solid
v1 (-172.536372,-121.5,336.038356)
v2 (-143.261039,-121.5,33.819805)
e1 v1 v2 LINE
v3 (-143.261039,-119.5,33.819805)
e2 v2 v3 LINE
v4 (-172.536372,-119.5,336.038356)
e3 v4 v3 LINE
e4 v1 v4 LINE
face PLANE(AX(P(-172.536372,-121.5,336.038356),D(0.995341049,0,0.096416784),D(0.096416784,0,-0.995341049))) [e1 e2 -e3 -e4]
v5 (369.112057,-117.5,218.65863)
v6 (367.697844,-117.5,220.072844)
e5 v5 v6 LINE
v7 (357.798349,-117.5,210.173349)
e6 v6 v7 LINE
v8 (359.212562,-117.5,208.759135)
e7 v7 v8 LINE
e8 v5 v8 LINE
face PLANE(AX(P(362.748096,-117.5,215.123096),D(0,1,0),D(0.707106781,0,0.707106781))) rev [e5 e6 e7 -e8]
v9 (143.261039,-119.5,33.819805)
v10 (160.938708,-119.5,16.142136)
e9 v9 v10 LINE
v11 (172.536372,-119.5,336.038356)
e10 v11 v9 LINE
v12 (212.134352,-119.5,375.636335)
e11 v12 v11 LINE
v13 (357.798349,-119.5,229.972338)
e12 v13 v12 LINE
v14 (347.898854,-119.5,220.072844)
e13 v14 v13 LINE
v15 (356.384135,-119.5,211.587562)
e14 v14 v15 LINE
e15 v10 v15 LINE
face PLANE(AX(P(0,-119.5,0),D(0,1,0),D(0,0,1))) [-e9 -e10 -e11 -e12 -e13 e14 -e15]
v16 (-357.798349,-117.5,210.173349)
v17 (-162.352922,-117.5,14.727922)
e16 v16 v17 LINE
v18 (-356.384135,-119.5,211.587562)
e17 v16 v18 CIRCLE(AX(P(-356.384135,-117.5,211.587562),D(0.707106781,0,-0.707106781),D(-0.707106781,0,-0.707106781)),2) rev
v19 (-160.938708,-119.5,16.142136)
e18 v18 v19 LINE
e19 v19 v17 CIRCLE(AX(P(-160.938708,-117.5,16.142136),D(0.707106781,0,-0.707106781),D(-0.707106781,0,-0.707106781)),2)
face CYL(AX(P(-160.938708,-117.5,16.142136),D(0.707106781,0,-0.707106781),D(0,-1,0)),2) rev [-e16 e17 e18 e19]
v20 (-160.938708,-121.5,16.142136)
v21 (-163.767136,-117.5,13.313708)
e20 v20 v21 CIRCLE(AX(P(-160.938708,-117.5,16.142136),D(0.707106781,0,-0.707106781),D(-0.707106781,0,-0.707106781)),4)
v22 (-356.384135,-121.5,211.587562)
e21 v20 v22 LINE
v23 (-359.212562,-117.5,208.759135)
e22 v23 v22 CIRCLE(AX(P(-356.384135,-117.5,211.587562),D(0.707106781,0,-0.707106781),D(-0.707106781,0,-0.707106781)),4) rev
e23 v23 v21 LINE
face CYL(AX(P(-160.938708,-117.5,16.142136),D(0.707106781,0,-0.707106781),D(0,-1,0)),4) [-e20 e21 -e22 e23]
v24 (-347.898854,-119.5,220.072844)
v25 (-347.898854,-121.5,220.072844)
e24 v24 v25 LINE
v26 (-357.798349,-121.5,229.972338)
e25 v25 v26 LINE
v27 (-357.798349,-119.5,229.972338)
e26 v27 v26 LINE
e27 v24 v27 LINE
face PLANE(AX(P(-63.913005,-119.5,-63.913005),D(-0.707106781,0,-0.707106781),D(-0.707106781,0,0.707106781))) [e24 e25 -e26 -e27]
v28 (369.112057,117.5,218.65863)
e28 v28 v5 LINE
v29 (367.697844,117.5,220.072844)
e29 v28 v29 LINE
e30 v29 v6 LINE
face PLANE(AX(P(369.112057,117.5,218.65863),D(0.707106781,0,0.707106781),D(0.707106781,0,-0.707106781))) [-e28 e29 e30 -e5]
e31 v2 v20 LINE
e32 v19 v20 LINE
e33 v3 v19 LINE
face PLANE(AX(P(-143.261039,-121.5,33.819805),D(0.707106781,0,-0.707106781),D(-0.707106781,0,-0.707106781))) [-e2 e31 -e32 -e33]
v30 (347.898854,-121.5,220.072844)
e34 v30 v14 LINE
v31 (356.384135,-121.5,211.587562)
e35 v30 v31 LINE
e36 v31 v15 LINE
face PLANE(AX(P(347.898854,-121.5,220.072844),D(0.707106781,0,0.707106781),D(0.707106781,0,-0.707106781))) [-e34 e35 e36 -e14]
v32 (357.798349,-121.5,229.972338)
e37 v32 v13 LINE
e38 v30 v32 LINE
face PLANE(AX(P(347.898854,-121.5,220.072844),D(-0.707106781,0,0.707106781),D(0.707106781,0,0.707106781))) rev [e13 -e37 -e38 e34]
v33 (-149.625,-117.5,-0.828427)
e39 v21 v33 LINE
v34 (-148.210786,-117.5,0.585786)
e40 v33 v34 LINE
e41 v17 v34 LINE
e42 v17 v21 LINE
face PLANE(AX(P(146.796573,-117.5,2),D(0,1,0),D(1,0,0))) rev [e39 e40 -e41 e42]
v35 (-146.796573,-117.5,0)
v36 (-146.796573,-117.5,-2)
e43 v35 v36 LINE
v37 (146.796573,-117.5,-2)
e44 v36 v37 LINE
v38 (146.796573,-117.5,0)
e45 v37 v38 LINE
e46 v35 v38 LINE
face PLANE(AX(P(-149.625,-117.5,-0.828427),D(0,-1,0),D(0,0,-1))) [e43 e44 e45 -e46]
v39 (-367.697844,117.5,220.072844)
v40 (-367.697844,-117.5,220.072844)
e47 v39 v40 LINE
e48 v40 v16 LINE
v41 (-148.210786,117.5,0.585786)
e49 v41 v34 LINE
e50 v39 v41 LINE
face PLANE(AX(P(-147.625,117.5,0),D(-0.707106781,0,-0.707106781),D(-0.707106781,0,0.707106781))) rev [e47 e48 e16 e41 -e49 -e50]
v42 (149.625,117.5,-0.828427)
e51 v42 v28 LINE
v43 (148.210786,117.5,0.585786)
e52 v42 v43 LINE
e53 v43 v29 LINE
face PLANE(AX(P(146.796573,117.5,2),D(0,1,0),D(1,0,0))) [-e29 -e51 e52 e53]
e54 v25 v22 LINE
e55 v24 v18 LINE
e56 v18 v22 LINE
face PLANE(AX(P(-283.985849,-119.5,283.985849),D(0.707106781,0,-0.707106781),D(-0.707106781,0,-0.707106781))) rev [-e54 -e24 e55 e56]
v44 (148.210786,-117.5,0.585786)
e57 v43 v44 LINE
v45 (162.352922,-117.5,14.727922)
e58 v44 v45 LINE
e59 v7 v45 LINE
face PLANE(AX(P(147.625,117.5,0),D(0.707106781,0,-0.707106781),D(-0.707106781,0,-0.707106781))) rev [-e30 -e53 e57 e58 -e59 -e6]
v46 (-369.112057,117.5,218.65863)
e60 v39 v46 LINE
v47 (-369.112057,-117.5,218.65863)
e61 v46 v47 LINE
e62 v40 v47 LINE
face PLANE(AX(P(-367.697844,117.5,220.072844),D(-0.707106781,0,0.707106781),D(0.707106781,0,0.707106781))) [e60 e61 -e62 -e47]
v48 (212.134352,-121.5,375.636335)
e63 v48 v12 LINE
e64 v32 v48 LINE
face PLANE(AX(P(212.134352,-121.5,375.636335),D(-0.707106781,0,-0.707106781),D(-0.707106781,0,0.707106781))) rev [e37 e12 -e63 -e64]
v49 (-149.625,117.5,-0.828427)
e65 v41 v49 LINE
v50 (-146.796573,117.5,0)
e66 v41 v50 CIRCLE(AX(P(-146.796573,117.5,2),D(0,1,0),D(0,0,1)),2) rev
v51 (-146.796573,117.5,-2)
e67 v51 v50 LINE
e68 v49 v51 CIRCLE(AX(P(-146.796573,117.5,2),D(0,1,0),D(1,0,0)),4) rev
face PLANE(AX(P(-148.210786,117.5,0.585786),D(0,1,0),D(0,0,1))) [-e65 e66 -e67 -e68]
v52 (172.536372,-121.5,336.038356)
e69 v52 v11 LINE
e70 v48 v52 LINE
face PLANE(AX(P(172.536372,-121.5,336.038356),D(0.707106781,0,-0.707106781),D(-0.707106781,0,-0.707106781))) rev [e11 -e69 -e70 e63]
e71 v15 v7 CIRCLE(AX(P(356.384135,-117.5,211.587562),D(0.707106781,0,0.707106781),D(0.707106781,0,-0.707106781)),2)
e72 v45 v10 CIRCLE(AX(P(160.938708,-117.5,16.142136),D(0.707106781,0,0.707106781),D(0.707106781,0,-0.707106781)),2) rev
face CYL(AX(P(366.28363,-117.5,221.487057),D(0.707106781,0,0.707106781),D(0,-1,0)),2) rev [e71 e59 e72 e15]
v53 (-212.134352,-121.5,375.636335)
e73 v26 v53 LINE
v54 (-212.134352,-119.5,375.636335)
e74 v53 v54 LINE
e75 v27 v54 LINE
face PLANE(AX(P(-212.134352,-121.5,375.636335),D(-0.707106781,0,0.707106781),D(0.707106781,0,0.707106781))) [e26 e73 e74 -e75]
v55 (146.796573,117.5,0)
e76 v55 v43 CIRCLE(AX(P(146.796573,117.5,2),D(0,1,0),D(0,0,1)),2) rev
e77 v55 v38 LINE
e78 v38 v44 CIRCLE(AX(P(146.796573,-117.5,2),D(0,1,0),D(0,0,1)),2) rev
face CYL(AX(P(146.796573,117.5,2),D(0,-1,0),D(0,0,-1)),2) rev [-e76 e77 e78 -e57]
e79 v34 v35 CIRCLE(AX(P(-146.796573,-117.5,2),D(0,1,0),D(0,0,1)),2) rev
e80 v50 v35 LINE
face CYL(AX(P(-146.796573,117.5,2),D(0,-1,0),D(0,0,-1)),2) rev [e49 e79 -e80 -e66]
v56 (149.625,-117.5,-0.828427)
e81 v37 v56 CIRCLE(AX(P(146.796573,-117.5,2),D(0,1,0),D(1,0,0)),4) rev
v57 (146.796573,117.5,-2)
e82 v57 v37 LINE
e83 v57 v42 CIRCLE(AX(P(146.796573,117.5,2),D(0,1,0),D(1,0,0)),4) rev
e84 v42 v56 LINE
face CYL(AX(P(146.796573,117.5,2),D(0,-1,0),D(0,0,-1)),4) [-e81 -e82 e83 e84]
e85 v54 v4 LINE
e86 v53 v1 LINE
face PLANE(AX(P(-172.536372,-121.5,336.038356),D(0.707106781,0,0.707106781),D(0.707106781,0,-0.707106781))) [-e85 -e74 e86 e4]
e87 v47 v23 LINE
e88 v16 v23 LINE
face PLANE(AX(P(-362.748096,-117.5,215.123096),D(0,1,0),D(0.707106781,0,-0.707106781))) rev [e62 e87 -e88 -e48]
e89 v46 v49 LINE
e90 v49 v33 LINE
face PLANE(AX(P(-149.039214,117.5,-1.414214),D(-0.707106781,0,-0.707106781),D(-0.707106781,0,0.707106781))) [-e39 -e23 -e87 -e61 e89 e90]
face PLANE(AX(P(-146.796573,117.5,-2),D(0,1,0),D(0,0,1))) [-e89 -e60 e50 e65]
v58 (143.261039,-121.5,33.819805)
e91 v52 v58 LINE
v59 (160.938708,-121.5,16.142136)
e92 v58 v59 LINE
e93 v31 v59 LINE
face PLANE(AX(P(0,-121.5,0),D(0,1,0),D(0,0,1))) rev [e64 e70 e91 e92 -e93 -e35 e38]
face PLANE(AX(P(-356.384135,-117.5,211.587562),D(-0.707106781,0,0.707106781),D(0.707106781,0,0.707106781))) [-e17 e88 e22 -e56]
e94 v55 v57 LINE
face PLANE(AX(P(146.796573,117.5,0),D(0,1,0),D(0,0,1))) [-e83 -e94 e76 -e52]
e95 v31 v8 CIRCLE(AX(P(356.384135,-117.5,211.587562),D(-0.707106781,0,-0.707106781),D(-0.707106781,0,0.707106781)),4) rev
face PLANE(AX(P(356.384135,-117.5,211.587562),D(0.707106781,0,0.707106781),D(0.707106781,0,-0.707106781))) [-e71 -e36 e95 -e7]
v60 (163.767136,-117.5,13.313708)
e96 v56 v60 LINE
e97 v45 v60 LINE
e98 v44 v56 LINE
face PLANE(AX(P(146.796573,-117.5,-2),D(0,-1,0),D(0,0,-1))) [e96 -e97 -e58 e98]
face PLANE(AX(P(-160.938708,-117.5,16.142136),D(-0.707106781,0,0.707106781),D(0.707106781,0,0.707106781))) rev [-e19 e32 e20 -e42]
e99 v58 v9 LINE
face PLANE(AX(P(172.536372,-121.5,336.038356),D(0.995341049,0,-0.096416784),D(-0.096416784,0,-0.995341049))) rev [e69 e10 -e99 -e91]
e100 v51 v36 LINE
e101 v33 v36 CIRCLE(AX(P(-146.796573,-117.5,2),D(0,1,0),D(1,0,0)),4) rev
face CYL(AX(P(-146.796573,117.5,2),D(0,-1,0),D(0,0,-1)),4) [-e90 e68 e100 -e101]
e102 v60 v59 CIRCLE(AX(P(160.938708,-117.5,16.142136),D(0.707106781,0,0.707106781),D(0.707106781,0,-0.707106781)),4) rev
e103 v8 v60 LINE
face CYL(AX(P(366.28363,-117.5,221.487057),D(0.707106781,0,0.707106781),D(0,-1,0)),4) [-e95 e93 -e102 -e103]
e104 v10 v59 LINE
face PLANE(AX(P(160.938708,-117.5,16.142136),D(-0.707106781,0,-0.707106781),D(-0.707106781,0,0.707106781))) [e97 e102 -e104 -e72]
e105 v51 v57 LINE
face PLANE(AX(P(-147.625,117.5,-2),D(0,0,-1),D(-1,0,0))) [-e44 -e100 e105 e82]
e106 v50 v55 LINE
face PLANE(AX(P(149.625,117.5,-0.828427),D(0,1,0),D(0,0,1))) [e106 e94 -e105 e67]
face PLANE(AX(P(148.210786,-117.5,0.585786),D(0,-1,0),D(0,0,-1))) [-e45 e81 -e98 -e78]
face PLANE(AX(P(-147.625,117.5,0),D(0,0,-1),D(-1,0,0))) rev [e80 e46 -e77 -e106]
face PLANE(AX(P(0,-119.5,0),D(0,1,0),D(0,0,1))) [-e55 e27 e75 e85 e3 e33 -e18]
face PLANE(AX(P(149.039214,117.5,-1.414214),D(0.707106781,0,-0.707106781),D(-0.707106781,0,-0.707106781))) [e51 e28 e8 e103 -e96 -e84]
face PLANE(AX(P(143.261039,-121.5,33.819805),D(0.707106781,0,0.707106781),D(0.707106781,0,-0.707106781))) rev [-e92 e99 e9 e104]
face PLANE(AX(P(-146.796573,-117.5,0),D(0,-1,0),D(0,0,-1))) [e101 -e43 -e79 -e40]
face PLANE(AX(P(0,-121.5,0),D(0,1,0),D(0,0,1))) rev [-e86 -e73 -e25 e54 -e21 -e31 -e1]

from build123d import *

# Parameters (mm, degrees)
SM_BASE_FLANGE_1_DEPTH      = 117.5
SM_EDGE_FLANGE_1_DEPTH      = 290.401572875
SM_START                    = 2
SM_EDGE_FLANGE_1_FLAT_DEPTH = 2
CUT_EXTRUDE_START           = -14
CUT_EXTRUDE_2_DEPTH         = 14


# Read off the part's stored shape, not the designer's step: 切除-拉伸2
# Sheet-metal steps are written as plain solids
with BuildPart() as part:
    # Sketch 1 → 基体-法兰1 (new, symmetric)
    with BuildSketch(Plane(origin=(0, 0, 0), x_dir=(1, 0, 0), z_dir=(0, 1, 0))):
        with BuildLine():
            Line((-367.697843509, -220.072843509), (-148.210786438, -0.585786438))
            ThreePointArc((-148.210786438, -0.585786438), (-147.56193974, -0.152240935), (-146.796572875, 0))
            Line((-146.796572875, 0), (146.796572875, 0))
            ThreePointArc((146.796572875, 0), (147.56193974, -0.152240935), (148.210786438, -0.585786438))
            Line((148.210786438, -0.585786438), (367.697843509, -220.072843509))
            Line((367.697843509, -220.072843509), (369.112057071, -218.658629946))
            Line((369.112057071, -218.658629946), (149.625, 0.828427125))
            ThreePointArc((149.625, 0.828427125), (148.327306605, 1.69551813), (146.796572875, 2))
            Line((146.796572875, 2), (-146.796572875, 2))
            ThreePointArc((-146.796572875, 2), (-148.327306605, 1.69551813), (-149.625, 0.828427125))
            Line((-149.625, 0.828427125), (-369.112057071, -218.658629946))
            Line((-369.112057071, -218.658629946), (-367.697843509, -220.072843509))
        make_face()
    extrude(amount=SM_BASE_FLANGE_1_DEPTH, both=True)

    # 边线-法兰1 bend section (across the edge) → 边线-法兰1 (add)
    with BuildSketch(Plane(origin=(162.352922061, -119.5, 14.727922061), x_dir=(0, 1, 0), z_dir=(0.7071067811865512, 0, 0.7071067811865439))):
        with BuildLine():
            Line((-2, 2), (0, 2))
            ThreePointArc((0, 2), (0.585786438, 0.585786438), (2, 0))
            Line((2, 0), (2, -2))
            ThreePointArc((2, -2), (-0.828427125, -0.828427125), (-2, 2))
        make_face()
    sm_edge_flange_1 = extrude(amount=SM_EDGE_FLANGE_1_DEPTH)

    # 边线-法兰1 profile (on flange) → 边线-法兰1 flat (add)
    with BuildSketch(Plane(origin=(73.8125, -119.5, -73.8125), x_dir=(0.7071067811865512, 0, 0.7071067811865439), z_dir=(0, -1, 0)).offset(SM_START)):
        Polygon((359.616638573, 220), (125.215065697, 27), (125.215065697, 2), (415.616638573, 2), (415.616638573, 220), align=None)
    sm_edge_flange_1_flat = extrude(amount=-SM_EDGE_FLANGE_1_FLAT_DEPTH)

    # 切除-拉伸2 outline → 切除-拉伸2 (cut)
    with BuildSketch(Plane(origin=(293.885343509, 0, 293.885343509), x_dir=(0.7071067811865338, 0, -0.7071067811865613), z_dir=(0.7071067811865613, 0, 0.7071067811865338)).offset(CUT_EXTRUDE_START)):
        with BuildLine():
            ThreePointArc((102.386638573, -121.5), (105.215065697, -120.328427125), (106.386638573, -117.5))
            Line((106.386638573, -117.5), (104.386638573, -117.5))
            ThreePointArc((104.386638573, -117.5), (103.800852135, -118.914213562), (102.386638573, -119.5))
            Line((102.386638573, -119.5), (90.386638573, -119.5))
            Line((90.386638573, -119.5), (90.386638573, -121.5))
            Line((90.386638573, -121.5), (102.386638573, -121.5))
        make_face()
    cut_extrude_2 = extrude(amount=CUT_EXTRUDE_2_DEPTH, mode=Mode.SUBTRACT)

    # 镜向1: 边线-法兰1, 边线-法兰1 flat, 切除-拉伸2 across plane
    add(sm_edge_flange_1.mirror(Plane(origin=(0, 0, 0), x_dir=(0, 0, 1), z_dir=(1, 0, 0))))
    add(sm_edge_flange_1_flat.mirror(Plane(origin=(0, 0, 0), x_dir=(0, 0, 1), z_dir=(1, 0, 0))))
    add(cut_extrude_2.mirror(Plane(origin=(0, 0, 0), x_dir=(0, 0, 1), z_dir=(1, 0, 0))), mode=Mode.SUBTRACT)


solid = part.part
